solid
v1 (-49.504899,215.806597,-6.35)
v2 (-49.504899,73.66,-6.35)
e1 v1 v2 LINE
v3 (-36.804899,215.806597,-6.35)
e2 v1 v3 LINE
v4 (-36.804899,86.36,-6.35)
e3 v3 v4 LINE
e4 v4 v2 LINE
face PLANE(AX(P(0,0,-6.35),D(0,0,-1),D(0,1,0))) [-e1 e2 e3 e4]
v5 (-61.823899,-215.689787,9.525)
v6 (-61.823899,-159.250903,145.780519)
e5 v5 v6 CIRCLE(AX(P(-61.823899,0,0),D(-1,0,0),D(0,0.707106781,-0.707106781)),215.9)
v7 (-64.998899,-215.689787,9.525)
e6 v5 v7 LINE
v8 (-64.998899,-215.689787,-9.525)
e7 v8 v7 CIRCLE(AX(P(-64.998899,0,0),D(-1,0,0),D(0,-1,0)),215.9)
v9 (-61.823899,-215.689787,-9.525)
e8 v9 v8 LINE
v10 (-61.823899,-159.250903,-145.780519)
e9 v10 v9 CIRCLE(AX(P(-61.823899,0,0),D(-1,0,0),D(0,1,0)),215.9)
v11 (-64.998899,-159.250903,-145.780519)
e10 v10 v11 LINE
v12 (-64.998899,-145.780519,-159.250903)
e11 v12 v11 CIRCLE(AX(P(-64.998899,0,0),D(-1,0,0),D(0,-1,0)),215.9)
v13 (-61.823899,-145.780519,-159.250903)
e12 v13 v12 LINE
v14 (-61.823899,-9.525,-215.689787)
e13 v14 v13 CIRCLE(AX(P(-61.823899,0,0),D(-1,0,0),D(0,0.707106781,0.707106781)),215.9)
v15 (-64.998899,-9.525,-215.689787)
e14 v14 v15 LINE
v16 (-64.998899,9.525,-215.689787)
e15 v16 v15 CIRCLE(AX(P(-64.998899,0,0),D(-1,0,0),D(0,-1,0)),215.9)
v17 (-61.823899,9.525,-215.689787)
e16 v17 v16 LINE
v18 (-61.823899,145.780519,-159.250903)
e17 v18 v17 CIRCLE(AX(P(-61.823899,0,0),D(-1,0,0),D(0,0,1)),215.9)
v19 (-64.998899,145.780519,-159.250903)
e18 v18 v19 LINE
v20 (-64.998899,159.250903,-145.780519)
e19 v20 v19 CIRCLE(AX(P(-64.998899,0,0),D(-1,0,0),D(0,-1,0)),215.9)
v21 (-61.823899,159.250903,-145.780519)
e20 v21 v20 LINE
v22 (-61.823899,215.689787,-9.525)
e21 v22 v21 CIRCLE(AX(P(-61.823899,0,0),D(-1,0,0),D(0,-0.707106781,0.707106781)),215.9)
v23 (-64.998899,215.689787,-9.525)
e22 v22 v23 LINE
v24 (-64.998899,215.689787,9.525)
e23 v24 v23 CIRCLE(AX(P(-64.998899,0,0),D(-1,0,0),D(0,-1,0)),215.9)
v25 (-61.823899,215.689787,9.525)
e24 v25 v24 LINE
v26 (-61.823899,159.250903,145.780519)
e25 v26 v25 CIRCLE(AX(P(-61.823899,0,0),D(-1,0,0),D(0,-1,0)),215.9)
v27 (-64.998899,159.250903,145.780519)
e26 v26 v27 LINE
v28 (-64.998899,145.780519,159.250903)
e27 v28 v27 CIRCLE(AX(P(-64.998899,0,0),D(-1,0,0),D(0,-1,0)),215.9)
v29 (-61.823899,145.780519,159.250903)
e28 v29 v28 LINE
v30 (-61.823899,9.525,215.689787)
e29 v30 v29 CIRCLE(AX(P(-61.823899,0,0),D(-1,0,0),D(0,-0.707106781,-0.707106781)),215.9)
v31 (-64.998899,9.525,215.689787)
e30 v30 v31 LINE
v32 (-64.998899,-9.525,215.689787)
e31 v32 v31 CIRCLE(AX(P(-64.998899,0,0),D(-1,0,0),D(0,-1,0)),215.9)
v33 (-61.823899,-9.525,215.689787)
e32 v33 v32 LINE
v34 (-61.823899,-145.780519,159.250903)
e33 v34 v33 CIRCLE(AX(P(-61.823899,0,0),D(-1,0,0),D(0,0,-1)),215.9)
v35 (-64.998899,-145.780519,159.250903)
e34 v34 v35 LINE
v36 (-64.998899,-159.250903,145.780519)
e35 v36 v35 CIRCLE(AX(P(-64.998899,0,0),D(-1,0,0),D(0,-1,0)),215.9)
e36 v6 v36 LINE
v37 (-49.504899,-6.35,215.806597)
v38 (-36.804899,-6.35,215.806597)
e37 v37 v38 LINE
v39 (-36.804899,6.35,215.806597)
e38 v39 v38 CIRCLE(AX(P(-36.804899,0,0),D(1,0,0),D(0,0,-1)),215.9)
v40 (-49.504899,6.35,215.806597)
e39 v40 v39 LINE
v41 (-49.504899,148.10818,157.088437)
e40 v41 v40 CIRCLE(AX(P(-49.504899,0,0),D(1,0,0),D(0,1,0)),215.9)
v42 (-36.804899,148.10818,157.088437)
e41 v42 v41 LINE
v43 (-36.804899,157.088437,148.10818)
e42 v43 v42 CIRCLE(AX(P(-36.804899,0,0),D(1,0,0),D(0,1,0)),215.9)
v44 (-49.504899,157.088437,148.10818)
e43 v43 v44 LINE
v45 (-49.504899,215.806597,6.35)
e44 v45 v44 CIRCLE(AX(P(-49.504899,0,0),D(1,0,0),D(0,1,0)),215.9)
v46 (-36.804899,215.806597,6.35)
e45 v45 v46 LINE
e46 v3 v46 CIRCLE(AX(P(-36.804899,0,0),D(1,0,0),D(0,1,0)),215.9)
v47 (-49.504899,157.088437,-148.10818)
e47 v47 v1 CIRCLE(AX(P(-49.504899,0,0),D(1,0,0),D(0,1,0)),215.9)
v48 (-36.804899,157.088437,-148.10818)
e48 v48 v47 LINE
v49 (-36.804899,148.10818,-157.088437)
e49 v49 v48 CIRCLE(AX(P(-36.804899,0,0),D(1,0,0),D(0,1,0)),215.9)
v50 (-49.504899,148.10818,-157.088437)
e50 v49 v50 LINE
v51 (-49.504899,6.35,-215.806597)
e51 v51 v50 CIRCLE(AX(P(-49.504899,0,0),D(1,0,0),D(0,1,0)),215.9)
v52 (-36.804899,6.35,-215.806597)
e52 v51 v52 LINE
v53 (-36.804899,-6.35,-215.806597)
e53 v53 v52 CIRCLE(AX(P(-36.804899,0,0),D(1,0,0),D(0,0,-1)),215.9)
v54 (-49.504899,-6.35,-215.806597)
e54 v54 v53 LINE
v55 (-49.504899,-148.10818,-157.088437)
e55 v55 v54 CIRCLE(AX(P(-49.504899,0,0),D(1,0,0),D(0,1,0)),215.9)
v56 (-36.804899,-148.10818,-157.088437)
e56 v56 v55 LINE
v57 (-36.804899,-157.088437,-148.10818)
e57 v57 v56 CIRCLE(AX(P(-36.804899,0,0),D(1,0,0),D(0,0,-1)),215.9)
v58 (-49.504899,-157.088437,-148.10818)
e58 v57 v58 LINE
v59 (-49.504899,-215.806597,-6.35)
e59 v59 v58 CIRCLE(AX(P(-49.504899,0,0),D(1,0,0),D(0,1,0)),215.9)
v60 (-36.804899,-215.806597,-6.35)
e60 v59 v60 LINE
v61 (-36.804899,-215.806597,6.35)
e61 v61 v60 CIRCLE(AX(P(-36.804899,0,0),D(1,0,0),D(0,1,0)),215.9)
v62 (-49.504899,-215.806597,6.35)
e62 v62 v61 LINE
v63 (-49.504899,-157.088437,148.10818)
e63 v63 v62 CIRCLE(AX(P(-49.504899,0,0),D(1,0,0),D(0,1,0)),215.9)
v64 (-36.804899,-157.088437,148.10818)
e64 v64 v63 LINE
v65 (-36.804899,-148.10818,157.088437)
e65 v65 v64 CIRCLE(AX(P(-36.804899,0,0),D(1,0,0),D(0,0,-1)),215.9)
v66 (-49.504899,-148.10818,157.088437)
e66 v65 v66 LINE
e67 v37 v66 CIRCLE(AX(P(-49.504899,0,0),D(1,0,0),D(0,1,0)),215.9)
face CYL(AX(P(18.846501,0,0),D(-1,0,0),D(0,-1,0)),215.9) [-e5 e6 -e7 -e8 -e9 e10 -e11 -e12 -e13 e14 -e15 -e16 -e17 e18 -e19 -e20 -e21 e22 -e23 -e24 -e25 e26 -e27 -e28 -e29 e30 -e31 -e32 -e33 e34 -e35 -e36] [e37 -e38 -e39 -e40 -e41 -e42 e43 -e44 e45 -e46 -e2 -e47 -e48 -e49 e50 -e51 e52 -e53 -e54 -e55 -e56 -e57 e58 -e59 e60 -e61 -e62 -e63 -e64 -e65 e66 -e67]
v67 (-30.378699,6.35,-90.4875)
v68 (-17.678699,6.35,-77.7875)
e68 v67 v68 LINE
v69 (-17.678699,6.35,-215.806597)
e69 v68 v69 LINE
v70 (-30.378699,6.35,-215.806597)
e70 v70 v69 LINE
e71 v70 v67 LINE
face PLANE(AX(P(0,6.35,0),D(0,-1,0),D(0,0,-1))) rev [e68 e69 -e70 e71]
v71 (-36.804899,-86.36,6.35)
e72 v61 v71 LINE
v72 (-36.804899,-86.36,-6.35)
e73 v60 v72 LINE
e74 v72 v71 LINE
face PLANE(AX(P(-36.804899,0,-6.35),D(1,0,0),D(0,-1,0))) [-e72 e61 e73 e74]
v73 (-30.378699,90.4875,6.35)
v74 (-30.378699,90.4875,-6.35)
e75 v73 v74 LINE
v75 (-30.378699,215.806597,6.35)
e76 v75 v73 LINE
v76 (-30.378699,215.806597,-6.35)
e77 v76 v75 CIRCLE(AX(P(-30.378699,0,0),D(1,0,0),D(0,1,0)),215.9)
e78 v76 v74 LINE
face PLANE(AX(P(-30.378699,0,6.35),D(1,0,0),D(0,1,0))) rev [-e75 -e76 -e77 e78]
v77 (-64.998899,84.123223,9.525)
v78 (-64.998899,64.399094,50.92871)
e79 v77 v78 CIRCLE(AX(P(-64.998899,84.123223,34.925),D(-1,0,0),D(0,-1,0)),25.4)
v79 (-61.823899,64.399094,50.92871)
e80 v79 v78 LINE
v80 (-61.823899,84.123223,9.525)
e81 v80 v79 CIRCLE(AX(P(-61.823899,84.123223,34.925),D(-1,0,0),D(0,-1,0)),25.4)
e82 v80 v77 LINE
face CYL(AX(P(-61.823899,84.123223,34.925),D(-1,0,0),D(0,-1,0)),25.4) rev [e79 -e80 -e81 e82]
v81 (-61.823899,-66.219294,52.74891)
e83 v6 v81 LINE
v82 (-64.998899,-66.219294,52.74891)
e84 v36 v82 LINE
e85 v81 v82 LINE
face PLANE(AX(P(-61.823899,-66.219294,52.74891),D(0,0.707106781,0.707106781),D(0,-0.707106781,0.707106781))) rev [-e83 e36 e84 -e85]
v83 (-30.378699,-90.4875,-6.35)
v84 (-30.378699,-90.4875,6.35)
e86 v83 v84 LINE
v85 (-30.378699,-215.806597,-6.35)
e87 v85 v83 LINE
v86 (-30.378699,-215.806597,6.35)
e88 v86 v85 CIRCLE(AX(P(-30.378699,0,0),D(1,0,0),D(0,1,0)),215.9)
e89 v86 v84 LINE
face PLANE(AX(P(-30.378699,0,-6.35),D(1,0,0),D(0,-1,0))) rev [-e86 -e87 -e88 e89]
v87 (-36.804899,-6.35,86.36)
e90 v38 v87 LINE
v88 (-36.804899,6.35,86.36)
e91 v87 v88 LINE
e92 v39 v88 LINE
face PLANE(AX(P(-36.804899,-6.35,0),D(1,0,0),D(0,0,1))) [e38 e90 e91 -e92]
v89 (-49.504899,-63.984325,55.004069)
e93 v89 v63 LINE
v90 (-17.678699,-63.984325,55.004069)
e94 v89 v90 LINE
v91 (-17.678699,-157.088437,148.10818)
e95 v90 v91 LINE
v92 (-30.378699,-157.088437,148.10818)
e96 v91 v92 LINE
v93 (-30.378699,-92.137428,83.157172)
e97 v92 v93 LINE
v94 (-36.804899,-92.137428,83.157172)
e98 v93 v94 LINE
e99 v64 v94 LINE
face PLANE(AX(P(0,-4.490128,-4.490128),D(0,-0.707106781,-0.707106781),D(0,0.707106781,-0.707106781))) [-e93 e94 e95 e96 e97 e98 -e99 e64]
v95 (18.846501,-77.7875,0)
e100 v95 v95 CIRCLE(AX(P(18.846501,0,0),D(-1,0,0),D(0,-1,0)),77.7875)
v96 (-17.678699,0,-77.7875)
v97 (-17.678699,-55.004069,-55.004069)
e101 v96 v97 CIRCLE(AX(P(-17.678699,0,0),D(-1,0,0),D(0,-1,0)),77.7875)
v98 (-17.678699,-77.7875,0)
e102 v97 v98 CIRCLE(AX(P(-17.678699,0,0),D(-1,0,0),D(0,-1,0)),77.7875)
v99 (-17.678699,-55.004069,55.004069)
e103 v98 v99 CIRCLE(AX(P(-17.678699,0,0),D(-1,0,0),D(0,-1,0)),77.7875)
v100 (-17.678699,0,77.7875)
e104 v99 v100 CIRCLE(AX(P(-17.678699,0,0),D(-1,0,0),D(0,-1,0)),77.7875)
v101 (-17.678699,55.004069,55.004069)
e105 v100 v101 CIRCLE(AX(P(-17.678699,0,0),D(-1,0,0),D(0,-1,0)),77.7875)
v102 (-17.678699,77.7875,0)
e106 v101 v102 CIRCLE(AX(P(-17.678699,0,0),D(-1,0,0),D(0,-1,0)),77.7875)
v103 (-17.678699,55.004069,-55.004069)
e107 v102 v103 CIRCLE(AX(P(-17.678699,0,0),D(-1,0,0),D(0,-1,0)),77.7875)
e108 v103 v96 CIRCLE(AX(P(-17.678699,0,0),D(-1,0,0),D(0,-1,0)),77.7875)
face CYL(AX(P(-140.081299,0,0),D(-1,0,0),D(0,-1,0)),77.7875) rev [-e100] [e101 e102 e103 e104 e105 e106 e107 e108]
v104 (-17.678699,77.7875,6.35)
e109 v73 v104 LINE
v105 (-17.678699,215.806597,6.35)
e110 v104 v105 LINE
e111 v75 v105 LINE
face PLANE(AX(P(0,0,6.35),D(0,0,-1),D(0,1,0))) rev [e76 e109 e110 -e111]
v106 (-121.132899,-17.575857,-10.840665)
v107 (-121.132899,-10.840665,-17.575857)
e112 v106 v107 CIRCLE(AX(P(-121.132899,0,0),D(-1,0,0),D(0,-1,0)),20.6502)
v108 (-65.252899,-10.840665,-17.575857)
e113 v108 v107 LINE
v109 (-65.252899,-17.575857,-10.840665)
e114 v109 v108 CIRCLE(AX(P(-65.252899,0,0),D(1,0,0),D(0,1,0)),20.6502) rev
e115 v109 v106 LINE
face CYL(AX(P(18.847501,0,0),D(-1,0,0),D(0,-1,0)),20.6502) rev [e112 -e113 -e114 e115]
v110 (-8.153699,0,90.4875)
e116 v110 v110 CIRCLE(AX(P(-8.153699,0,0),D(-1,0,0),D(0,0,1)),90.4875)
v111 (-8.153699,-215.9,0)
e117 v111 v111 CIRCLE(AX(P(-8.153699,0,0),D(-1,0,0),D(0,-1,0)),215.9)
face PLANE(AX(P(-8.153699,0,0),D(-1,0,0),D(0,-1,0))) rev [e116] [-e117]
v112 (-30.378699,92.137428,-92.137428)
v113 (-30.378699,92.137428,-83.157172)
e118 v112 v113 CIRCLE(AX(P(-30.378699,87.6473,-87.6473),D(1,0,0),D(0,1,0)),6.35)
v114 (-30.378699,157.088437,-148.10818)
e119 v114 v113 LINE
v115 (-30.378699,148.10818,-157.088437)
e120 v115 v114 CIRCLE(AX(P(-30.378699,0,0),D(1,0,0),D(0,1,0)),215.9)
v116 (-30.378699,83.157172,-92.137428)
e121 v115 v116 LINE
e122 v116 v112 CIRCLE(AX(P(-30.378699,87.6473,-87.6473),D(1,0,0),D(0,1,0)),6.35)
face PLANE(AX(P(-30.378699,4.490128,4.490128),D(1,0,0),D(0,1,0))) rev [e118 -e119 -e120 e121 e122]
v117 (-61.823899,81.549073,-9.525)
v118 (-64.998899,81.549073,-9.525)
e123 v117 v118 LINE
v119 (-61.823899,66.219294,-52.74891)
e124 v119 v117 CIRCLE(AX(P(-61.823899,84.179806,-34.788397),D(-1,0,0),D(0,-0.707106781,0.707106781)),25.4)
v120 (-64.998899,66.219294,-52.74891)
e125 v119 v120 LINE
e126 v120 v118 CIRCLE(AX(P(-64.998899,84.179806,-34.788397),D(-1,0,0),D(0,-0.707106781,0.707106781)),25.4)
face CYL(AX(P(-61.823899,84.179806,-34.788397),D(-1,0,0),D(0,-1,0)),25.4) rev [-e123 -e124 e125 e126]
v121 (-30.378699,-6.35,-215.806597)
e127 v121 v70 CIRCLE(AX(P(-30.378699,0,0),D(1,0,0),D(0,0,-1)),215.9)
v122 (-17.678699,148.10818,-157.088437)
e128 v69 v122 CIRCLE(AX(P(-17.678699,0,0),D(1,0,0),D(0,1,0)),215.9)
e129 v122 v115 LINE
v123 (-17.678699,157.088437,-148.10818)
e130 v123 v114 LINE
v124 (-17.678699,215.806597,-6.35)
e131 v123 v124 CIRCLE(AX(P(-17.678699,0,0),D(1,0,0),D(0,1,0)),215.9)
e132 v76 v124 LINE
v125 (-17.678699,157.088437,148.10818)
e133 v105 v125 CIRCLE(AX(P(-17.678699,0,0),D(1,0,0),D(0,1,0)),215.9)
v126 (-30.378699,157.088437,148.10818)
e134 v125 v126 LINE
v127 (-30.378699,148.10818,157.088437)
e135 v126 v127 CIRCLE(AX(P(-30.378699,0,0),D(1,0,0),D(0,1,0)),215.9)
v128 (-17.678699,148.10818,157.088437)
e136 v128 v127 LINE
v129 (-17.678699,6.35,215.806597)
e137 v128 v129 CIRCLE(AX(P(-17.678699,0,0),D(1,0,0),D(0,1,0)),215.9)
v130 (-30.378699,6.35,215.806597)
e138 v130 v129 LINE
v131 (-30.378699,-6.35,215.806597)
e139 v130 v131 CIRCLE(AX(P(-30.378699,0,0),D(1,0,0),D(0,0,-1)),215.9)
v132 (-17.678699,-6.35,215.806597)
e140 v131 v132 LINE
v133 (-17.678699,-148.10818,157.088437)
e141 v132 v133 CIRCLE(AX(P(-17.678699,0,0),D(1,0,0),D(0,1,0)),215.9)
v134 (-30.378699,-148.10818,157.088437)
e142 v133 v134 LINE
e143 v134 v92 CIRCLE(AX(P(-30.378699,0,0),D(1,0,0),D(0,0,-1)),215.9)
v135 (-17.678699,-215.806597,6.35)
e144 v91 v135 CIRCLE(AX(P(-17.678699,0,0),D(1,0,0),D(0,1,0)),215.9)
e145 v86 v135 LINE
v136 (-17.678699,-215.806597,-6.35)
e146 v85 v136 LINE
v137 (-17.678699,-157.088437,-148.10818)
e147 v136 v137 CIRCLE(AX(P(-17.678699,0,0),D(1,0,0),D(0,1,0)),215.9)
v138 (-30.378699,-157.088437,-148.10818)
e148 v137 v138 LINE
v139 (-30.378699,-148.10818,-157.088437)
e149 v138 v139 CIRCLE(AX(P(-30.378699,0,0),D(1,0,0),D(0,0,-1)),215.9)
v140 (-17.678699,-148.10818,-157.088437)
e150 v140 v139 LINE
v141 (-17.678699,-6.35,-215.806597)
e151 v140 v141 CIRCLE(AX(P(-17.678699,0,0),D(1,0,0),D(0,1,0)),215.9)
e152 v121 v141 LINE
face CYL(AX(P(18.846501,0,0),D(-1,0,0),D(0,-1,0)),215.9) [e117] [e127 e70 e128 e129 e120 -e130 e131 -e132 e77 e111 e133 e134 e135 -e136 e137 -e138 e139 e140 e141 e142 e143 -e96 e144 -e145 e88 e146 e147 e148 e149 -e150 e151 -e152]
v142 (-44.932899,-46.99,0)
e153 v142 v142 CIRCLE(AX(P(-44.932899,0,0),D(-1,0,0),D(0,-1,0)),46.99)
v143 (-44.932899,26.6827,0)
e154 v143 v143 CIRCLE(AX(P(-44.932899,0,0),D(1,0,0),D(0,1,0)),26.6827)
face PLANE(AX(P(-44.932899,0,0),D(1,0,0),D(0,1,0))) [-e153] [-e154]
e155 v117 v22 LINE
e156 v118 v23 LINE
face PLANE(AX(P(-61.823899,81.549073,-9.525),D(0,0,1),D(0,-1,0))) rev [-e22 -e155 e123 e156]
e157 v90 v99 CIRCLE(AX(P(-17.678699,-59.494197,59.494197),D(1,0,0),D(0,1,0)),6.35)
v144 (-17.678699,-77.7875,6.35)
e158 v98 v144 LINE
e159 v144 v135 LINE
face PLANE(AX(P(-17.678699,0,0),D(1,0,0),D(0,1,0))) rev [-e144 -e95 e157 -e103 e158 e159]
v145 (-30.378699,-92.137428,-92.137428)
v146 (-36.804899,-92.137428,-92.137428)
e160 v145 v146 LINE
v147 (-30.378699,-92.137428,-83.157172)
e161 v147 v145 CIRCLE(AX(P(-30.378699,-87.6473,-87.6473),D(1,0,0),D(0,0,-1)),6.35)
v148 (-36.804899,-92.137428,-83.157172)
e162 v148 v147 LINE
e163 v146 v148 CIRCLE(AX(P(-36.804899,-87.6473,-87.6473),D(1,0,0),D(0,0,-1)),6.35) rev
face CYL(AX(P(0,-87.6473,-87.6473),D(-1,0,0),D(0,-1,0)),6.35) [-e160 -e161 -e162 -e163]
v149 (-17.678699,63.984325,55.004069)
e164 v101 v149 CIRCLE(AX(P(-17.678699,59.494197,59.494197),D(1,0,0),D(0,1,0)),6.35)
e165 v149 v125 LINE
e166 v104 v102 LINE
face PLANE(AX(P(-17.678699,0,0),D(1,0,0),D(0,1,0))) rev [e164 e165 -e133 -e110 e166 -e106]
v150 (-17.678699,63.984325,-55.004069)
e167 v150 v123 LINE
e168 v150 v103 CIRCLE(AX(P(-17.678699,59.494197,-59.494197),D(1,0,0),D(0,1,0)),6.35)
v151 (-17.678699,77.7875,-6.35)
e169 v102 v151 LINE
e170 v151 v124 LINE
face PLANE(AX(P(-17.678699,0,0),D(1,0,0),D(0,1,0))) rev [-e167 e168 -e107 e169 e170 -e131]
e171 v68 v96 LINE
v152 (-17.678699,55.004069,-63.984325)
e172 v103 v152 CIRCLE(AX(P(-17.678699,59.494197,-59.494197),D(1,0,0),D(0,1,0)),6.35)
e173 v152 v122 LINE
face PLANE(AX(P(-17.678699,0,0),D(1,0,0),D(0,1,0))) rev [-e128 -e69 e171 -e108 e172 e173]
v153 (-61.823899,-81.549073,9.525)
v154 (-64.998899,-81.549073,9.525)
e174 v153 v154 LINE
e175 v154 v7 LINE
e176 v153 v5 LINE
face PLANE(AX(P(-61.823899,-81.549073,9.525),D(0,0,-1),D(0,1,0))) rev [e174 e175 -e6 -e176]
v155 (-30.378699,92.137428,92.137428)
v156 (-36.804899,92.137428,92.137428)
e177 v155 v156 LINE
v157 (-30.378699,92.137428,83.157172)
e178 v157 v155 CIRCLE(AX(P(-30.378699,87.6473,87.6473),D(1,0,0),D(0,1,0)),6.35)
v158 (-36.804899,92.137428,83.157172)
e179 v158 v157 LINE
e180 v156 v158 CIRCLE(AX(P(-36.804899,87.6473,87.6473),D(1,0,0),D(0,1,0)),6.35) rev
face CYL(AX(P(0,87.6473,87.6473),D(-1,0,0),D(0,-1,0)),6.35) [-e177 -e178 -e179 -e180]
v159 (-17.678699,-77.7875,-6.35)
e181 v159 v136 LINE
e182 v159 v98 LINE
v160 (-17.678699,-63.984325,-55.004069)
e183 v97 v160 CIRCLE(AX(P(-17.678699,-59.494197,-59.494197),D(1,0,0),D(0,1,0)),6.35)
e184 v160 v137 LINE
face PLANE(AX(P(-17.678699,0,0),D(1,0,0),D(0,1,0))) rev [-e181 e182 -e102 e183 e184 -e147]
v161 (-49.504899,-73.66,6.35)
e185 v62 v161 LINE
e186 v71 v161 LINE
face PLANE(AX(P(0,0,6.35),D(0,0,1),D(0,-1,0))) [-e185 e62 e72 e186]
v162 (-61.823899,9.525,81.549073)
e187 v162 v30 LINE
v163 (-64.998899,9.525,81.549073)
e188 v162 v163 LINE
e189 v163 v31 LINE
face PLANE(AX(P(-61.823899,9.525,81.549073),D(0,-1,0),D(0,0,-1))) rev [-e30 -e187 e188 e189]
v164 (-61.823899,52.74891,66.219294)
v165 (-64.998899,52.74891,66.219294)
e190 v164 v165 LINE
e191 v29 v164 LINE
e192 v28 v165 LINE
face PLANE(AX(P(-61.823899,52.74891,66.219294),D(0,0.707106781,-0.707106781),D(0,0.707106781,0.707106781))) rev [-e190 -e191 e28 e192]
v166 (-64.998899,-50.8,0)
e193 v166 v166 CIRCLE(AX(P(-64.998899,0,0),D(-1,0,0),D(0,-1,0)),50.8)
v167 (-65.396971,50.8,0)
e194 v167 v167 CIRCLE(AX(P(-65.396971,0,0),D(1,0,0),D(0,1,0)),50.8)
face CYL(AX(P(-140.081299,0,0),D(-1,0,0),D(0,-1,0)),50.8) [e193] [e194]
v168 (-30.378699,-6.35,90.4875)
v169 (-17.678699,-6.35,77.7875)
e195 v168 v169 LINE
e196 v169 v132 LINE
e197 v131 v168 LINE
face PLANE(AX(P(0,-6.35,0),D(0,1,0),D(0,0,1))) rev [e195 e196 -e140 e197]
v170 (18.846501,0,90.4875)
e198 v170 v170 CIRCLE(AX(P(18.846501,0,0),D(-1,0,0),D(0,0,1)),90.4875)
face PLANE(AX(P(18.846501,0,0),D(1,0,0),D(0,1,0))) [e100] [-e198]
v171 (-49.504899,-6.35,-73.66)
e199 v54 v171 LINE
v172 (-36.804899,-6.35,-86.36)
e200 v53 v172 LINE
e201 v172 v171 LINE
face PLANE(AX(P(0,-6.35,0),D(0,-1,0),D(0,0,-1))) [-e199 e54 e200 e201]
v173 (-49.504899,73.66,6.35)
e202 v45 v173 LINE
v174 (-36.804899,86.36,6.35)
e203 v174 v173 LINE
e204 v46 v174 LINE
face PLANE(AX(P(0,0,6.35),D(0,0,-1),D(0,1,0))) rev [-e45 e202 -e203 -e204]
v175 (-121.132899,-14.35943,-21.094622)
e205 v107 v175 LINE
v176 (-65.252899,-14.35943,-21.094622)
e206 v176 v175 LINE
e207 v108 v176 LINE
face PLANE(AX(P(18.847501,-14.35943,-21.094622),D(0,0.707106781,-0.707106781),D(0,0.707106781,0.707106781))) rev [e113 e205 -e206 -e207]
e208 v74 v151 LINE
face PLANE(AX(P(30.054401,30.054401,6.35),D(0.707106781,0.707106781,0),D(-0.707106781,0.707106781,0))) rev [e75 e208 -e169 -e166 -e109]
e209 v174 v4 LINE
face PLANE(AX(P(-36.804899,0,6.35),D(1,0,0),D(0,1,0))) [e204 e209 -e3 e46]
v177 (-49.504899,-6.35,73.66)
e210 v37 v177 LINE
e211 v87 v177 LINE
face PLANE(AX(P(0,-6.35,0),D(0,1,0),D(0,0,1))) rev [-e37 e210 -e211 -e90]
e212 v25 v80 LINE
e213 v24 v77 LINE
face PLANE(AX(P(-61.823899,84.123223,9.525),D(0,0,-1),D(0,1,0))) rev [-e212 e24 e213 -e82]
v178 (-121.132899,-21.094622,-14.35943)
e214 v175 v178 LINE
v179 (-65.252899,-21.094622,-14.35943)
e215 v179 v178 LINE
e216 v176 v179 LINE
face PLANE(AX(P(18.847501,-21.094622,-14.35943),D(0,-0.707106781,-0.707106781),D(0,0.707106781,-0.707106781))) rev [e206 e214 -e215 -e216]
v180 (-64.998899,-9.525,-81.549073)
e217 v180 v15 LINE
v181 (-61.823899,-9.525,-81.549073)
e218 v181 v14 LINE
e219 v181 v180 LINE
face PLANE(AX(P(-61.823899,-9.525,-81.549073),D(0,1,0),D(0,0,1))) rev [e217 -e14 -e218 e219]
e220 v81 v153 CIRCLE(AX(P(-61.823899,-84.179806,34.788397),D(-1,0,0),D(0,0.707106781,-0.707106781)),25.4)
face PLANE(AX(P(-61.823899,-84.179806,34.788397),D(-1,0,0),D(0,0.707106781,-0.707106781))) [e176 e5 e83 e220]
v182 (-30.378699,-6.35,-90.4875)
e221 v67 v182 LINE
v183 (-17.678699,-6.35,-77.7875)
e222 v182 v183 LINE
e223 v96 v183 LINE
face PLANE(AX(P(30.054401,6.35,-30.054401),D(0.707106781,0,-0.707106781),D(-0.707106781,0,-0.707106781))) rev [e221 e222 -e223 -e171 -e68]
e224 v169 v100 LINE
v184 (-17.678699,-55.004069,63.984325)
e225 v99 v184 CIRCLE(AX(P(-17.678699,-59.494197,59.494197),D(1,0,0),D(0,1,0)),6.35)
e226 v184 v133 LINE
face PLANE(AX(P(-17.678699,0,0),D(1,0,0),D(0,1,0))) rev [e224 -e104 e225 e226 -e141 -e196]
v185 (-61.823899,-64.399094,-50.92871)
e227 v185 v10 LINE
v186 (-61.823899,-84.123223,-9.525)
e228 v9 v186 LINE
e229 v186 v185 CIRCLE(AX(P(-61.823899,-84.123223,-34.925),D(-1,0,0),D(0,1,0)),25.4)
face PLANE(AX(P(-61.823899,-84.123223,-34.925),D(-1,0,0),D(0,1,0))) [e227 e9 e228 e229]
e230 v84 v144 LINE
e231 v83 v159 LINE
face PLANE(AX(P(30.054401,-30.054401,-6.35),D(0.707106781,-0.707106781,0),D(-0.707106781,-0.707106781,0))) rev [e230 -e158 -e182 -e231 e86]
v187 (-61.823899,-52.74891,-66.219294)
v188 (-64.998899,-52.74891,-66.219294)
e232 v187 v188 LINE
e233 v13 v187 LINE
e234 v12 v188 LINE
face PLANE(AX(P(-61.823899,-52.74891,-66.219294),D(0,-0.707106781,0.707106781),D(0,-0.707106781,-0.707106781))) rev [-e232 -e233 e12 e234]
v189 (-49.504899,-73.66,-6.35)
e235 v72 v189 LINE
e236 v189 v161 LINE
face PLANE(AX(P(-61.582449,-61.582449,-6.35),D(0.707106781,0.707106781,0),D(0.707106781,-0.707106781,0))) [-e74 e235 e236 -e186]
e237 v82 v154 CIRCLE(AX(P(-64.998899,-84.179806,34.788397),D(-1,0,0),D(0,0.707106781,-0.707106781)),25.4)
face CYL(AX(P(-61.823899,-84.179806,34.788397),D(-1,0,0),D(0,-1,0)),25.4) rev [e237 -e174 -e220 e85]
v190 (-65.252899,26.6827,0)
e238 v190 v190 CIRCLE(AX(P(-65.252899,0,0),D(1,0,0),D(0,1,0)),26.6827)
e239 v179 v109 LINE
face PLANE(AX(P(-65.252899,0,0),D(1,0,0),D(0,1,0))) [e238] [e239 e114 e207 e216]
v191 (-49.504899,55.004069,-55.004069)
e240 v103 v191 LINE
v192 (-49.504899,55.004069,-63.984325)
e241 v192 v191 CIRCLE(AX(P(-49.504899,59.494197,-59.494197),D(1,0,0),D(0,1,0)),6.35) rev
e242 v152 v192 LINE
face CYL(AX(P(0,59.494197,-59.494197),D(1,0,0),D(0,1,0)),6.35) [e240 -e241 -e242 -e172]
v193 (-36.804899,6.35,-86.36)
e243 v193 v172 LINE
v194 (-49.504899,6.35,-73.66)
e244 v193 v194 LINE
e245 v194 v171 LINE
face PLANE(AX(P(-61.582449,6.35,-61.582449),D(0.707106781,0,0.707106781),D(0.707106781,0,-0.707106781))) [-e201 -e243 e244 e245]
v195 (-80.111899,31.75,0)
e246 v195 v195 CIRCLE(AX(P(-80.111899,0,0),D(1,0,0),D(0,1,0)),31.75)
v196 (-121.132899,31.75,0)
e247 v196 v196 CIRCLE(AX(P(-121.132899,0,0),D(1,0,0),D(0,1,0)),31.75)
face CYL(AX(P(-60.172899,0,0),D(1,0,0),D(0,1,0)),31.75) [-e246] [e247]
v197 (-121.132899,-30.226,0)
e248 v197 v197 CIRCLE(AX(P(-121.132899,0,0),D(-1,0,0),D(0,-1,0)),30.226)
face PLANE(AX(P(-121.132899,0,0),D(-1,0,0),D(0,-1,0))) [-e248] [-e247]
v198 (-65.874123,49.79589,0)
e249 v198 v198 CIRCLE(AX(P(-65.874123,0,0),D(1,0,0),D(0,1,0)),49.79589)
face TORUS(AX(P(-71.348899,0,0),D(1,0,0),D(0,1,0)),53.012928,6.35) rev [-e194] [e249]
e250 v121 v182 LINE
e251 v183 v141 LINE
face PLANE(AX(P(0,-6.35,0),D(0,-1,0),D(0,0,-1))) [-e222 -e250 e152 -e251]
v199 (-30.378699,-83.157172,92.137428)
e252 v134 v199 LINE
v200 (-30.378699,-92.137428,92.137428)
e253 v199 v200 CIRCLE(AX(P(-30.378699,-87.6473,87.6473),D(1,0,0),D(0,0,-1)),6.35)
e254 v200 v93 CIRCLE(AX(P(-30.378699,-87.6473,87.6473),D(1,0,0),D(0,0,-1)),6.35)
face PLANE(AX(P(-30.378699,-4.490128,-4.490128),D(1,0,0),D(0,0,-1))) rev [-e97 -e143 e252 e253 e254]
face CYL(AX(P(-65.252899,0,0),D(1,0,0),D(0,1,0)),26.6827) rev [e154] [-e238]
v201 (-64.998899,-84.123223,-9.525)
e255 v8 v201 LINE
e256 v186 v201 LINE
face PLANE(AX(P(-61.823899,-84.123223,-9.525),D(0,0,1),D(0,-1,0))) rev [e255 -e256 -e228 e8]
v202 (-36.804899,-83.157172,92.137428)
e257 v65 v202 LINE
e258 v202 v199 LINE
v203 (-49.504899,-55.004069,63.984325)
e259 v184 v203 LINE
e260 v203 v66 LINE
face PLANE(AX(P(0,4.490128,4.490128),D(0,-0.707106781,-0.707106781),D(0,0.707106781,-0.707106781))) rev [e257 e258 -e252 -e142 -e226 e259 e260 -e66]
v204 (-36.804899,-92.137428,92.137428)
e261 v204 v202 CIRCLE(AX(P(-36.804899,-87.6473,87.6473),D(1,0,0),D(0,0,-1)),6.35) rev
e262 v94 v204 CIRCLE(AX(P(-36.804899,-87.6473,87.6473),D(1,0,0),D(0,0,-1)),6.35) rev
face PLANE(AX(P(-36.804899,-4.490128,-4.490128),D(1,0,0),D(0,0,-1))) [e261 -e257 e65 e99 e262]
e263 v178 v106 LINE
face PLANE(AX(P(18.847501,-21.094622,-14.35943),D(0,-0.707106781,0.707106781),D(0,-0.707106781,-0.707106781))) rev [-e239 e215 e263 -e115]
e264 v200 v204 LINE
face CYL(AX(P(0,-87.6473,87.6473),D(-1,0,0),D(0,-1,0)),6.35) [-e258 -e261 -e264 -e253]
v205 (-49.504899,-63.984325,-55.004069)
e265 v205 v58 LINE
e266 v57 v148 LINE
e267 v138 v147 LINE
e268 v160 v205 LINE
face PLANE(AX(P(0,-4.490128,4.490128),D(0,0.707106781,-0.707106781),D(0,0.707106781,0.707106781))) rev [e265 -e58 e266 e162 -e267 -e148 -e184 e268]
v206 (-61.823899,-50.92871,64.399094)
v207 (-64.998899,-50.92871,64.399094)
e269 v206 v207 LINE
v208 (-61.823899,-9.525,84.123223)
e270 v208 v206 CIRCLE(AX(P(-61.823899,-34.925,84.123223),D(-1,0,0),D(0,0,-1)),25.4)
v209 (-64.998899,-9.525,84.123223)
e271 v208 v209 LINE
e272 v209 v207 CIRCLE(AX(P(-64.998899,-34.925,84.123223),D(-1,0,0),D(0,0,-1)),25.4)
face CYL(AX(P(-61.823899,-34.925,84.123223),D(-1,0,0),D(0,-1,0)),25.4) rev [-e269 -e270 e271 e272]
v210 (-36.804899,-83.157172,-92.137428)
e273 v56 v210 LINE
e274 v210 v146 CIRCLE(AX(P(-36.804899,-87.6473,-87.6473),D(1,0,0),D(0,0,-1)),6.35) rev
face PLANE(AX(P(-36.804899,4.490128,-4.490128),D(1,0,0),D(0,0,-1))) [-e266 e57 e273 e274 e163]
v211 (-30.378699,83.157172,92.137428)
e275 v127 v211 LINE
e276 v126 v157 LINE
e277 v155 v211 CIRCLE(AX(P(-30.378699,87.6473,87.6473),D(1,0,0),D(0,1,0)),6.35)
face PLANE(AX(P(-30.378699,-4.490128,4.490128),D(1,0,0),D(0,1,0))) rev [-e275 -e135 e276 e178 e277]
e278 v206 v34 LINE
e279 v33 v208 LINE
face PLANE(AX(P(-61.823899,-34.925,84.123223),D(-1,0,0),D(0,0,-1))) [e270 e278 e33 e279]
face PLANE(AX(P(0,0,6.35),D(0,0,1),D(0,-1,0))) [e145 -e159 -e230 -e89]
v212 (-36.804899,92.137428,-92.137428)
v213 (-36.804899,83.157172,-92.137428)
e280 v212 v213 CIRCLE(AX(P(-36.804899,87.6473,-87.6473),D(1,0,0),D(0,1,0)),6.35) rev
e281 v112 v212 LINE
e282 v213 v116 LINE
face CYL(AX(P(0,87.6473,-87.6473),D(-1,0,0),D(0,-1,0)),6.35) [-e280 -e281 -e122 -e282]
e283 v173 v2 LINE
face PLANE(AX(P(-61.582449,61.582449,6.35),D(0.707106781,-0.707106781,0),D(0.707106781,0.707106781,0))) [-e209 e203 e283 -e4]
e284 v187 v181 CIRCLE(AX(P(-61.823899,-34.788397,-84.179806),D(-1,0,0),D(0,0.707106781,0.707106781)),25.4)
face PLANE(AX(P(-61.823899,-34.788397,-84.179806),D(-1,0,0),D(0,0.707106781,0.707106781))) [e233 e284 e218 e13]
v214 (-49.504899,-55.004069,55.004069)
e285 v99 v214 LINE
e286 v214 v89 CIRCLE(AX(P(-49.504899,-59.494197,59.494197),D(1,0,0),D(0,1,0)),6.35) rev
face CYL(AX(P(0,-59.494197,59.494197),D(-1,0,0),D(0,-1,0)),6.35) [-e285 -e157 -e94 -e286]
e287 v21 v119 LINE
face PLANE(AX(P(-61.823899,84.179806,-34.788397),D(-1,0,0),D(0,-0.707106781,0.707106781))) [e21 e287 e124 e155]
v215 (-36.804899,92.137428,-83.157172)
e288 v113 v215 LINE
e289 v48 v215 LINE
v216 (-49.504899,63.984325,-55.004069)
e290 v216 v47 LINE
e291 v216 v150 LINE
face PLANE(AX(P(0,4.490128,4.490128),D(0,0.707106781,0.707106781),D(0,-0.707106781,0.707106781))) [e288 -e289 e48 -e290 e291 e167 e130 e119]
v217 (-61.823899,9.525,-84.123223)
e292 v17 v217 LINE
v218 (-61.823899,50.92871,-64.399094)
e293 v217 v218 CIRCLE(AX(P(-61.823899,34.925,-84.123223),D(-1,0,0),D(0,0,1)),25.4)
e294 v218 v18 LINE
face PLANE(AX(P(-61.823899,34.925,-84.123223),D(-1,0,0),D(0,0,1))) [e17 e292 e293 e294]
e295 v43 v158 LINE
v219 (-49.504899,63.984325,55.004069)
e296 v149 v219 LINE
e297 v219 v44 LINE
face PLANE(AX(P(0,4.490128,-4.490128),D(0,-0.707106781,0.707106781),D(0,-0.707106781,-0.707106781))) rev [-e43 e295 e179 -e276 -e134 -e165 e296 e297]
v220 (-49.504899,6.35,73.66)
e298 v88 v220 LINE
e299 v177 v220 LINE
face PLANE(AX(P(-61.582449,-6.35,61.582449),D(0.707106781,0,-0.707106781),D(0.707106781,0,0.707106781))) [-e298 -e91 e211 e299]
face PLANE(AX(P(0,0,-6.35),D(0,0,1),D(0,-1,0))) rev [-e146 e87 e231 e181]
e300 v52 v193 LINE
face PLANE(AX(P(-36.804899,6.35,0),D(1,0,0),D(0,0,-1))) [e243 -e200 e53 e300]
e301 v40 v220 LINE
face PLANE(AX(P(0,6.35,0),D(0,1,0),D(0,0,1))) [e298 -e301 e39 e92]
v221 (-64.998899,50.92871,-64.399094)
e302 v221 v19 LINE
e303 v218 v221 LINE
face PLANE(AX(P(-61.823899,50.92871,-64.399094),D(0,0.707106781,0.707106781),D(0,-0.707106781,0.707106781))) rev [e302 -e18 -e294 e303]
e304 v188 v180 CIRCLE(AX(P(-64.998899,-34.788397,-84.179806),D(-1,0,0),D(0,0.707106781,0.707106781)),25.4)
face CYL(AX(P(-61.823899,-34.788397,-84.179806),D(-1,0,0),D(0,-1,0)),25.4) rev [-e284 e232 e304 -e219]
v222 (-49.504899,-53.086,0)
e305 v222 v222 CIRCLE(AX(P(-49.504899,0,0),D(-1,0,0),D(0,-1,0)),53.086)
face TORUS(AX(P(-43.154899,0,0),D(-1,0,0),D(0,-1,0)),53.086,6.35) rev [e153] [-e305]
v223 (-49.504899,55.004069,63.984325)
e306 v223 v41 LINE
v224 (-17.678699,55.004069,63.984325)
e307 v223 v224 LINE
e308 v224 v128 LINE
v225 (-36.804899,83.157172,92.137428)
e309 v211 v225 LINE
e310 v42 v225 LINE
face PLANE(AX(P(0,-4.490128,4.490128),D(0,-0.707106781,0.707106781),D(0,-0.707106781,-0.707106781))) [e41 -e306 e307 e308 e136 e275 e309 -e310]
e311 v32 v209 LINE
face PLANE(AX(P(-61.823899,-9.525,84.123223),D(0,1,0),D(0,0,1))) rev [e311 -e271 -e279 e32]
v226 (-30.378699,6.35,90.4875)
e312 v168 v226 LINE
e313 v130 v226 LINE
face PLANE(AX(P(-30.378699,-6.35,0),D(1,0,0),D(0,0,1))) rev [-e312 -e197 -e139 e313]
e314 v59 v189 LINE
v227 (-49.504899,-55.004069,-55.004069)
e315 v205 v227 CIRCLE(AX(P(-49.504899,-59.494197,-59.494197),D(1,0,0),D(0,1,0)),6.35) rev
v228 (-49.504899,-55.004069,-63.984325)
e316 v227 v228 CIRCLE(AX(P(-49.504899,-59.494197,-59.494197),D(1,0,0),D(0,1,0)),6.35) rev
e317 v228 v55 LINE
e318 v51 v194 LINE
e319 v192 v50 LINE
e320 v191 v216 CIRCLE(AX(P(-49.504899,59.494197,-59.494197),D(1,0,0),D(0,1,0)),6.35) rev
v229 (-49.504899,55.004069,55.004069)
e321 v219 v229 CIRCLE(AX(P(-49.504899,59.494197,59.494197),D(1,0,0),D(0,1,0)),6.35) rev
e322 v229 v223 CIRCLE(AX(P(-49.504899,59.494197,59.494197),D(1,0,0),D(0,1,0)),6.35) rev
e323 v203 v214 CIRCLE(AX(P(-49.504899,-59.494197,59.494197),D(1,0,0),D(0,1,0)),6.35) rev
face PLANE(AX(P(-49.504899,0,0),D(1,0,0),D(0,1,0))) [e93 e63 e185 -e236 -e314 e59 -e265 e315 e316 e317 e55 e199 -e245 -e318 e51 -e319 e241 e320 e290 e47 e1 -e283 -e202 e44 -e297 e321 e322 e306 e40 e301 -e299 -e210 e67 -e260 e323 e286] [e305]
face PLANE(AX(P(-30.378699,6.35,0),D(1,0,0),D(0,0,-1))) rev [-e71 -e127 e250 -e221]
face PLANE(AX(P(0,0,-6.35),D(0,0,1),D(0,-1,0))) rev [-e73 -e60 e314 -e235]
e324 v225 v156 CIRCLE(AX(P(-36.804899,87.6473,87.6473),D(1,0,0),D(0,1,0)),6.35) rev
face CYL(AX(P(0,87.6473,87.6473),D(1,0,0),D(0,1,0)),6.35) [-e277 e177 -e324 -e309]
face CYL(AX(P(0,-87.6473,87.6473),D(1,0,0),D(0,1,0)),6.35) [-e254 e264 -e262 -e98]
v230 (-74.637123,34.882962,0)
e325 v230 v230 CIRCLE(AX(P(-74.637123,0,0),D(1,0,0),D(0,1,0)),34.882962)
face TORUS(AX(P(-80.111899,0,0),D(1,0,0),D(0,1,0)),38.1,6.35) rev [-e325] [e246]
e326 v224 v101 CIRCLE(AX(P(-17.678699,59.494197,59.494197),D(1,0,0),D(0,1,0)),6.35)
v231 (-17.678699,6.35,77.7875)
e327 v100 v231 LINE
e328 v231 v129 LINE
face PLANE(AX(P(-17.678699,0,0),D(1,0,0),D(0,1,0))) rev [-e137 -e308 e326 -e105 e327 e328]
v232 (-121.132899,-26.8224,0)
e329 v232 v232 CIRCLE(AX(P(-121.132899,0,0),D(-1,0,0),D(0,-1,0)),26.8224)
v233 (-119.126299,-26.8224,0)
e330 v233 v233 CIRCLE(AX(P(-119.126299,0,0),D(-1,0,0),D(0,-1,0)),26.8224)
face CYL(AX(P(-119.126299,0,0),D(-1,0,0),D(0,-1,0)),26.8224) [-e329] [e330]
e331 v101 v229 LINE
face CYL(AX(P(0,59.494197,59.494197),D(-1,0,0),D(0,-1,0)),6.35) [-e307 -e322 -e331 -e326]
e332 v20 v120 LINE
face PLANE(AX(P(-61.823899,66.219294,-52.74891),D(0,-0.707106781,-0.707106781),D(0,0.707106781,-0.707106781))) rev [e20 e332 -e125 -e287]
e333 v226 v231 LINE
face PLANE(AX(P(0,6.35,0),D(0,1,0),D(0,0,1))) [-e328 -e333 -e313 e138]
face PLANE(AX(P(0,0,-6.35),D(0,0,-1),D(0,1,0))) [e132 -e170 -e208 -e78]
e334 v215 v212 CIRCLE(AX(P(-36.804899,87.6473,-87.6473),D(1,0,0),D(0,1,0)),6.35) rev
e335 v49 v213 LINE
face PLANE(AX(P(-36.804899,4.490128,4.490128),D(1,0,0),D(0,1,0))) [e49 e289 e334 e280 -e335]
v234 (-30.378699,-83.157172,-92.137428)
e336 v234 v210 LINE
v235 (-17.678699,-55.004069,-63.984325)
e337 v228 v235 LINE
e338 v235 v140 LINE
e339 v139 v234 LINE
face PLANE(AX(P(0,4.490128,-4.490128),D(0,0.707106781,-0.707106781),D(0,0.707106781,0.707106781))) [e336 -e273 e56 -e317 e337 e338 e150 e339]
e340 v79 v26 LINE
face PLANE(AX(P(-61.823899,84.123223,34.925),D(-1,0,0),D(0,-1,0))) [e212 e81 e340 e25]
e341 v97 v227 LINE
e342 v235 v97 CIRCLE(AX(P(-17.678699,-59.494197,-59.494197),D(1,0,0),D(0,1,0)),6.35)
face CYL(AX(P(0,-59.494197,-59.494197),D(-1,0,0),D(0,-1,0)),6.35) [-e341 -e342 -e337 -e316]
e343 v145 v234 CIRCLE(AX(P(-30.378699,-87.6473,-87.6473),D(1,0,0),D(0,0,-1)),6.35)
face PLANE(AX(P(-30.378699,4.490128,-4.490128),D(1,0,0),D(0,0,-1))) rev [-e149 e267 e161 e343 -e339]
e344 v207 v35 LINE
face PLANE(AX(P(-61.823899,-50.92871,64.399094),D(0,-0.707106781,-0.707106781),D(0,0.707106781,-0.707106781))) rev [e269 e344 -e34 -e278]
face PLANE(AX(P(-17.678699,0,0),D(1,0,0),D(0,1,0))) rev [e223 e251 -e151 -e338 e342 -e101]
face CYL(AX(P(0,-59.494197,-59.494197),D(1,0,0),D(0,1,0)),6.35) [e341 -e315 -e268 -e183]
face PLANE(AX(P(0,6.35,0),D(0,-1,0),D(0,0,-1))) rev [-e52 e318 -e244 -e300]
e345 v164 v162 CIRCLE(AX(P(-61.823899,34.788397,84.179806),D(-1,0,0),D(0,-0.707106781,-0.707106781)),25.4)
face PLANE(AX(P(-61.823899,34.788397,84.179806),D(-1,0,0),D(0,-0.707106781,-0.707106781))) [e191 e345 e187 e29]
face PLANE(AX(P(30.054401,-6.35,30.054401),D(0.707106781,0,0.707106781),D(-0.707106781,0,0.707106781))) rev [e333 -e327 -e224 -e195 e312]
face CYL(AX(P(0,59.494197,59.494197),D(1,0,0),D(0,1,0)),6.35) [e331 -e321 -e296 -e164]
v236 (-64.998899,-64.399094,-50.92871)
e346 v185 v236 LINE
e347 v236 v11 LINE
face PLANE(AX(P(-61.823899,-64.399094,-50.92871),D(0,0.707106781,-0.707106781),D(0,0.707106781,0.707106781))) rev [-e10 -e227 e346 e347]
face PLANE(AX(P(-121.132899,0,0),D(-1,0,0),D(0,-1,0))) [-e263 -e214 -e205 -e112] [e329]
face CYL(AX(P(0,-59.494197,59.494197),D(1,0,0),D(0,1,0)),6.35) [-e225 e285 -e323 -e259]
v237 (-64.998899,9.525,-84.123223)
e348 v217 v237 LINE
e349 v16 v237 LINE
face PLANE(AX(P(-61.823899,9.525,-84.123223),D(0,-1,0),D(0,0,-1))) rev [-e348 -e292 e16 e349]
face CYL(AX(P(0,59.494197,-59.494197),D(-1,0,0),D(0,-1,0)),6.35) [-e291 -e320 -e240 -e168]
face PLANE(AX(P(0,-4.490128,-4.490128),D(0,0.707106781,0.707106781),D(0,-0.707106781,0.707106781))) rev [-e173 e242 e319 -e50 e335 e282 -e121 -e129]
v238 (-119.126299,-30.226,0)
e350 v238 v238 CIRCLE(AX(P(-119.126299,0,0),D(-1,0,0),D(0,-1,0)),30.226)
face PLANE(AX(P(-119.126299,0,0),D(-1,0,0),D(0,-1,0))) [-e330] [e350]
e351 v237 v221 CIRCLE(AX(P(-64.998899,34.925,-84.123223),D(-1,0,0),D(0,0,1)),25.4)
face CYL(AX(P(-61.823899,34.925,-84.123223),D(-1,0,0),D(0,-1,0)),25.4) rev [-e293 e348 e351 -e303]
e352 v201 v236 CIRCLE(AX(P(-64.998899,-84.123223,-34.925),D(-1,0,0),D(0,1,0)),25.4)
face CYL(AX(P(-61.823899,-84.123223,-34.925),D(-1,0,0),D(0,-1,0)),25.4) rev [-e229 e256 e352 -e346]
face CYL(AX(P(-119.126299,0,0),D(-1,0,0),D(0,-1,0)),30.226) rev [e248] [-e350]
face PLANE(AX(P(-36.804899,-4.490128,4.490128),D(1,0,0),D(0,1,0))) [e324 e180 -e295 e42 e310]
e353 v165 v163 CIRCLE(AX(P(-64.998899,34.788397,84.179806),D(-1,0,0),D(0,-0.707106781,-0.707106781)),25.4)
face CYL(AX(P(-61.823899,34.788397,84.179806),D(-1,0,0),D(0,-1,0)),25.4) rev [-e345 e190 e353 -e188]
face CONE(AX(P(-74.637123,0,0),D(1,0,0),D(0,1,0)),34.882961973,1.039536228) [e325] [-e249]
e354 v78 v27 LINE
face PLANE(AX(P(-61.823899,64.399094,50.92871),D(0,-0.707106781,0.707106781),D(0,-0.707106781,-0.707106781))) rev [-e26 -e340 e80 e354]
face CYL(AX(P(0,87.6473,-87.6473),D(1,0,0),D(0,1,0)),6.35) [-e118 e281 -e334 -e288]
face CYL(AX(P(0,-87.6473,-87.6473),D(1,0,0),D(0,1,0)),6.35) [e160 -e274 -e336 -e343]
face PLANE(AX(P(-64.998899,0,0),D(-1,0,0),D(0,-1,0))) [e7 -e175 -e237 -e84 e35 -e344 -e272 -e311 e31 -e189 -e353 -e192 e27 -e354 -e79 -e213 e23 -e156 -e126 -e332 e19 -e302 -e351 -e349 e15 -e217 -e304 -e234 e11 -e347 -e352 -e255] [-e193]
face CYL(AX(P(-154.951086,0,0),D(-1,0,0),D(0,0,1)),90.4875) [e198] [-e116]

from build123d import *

# Parameters (mm, degrees)
BOSS_EXTRUDE3_DEPTH      = 6.35
FILLET1_R                = 6.35
CIRPATTERN5_COUNT        = 4
FILLET1_OF_CIRPATTERN5_R = 6.35
BOSS_EXTRUDE4_DEPTH      = 6.35
CIRPATTERN4_COUNT        = 4
SKETCH6_R                = 234.193665804
SKETCH6_R_2              = 215.9
CUT_EXTRUDE1_DEPTH       = 350.00288517
FILLET2_R                = 0.635
SKETCH7_R                = 60.93897947
CUT_EXTRUDE2_DEPTH       = 4.953
SKETCH8_R                = 79.670197019
CUT_EXTRUDE3_DEPTH       = 18.9484
CUT_EXTRUDE4_START       = 20.32
SKETCH11_R               = 219.71
SKETCH11_R_2             = 50.8
CUT_EXTRUDE4_DEPTH       = 20.32
CUT_EXTRUDE10_REACH      = 337.887
SKETCH20_R               = 30.226
SKETCH20_R_2             = 26.8224
CUT_EXTRUDE11_DEPTH      = 2.0066
CUT_EXTRUDE13_DEPTH      = 3.175
CIRPATTERN6_COUNT        = 8
SKETCH24_W               = 27.0002
SKETCH24_H               = 10.092146942
SKETCH25_R               = 26.6827
CUT_EXTRUDE14_DEPTH      = 20.32


with BuildPart() as part:
    # Sketch1 → Revolve2 (revolve)
    with BuildSketch(Plane.XY, mode=Mode.PRIVATE) as revolve2_sk:
        with BuildLine():
            Line((-140.081298787, 50.8), (-140.081298787, 0))
            Line((-140.081298787, 0), (-39.979898787, 0))
            Line((-39.979898787, 0), (-39.979898787, 46.736))
            Line((-39.979898787, 46.736), (-43.154898787, 46.736))
            ThreePointArc((-43.154898787, 46.736), (-47.645026847, 48.595871939), (-49.504898787, 53.086))
            Line((-49.504898787, 53.086), (-49.504898787, 219.71))
            Line((-49.504898787, 219.71), (-64.998898787, 219.71))
            Line((-64.998898787, 219.71), (-64.998898787, 63.5))
            ThreePointArc((-64.998898787, 63.5), (-68.718642666, 54.519743879), (-77.698898787, 50.8))
            Line((-77.698898787, 50.8), (-140.081298787, 50.8))
        make_face()
        with BuildLine():
            Line((-9.677698787, 219.71), (-17.678698787, 219.71))
            Line((-17.678698787, 219.71), (-17.678698787, 77.7875))
            Line((-17.678698787, 77.7875), (1.650701213, 77.7875))
            Line((1.650701213, 77.7875), (18.846501213, 77.7875))
            Line((18.846501213, 77.7875), (18.846501213, 93.599))
            ThreePointArc((18.846501213, 93.599), (18.400131948, 94.676630735), (17.322501213, 95.123))
            Line((17.322501213, 95.123), (-6.629698787, 95.123))
            ThreePointArc((-6.629698787, 95.123), (-7.707329521, 95.569369265), (-8.153698787, 96.647))
            Line((-8.153698787, 96.647), (-8.153698787, 218.186))
            ThreePointArc((-8.153698787, 218.186), (-8.600068052, 219.263630735), (-9.677698787, 219.71))
        make_face()
    revolve(revolve2_sk.sketch.rotate(Axis((-140.081298787, 0, 0), (1, 0, 0)), 180), axis=Axis((-140.081298787, 0, 0), (1, 0, 0)))

    # Sketch4 → Boss-Extrude3 (add, symmetric)
    with BuildSketch(Plane(origin=(0, 0, 0), x_dir=(1, 0, 0), z_dir=(0, -0.7071067811865488, 0.7071067811865464))):
        Polygon((-17.678698787, 219.71), (-30.378698787, 219.71), (-30.378698787, 130.302), (-36.804898787, 130.302), (-36.804898787, 219.71), (-49.504898787, 219.71), (-49.504898787, 77.7875), (-17.678698787, 77.7875), align=None)
    boss_extrude3 = extrude(amount=BOSS_EXTRUDE3_DEPTH, both=True)

    # Fillet1
    # the kernel refuses this fillet: 6.35 mm, written as the material it takes off along each edge
    with BuildSketch(Plane(origin=(-30.378698787, 87.647299742, 96.627555863), x_dir=(0, -0.7071067811865464, -0.7071067811865486), z_dir=(-1, 0, 0))) as fillet1_piece_1:
        with BuildLine():
            CenterArc((FILLET1_R, -FILLET1_R), FILLET1_R, 90, 90)
            Line((0, -FILLET1_R), (0, 0))
            Line((0, 0), (FILLET1_R, 0))
        make_face()
    extrude(amount=6.4262, mode=Mode.SUBTRACT)
    with BuildSketch(Plane(origin=(-30.378698787, 96.627555863, 87.647299742), x_dir=(0, -0.7071067811865464, -0.7071067811865486), z_dir=(-1, 0, 0))) as fillet1_piece_2:
        with BuildLine():
            CenterArc((FILLET1_R, FILLET1_R), FILLET1_R, 180, 90)
            Line((0, FILLET1_R), (0, 0))
            Line((0, 0), (FILLET1_R, 0))
        make_face()
    extrude(amount=6.4262, mode=Mode.SUBTRACT)
    with BuildSketch(Plane(origin=(-49.504898787, 59.494196802, 50.513940681), x_dir=(0, 0.707106781186547, 0.7071067811865481), z_dir=(1, 0, 0)), Plane(origin=(-49.504898787, 50.513940681, 59.494196802), x_dir=(0, 0.7071067811865492, -0.7071067811865459), z_dir=(1, 0, 0))) as fillet1_piece_3:
        with BuildLine():
            CenterArc((FILLET1_R, FILLET1_R), FILLET1_R, 180, 90)
            Line((0, FILLET1_R), (0, 0))
            Line((0, 0), (FILLET1_R, 0))
        make_face()
    extrude(amount=31.8262, mode=Mode.SUBTRACT)

    # CirPattern5: Boss-Extrude3 ×4 about axis
    cirpattern5_axis = Axis((0, 0, 0), (1, 0, 0))
    for i in range(1, CIRPATTERN5_COUNT):
        add(boss_extrude3.rotate(cirpattern5_axis, i * 360 / CIRPATTERN5_COUNT))

    # Fillet1 of CirPattern5
    # the kernel refuses this fillet: 6.35 mm, written as the material it takes off along each edge
    with BuildSketch(Plane(origin=(-30.378698787, -96.627555863, 87.647299742), x_dir=(0, 0.7071067811865509, -0.7071067811865441), z_dir=(-1, 0, 0)), Plane(origin=(-30.378698787, -87.647299742, -96.627555863), x_dir=(0, 0.7071067811865452, 0.7071067811865498), z_dir=(-1, 0, 0)), Plane(origin=(-30.378698787, 96.627555863, -87.647299742), x_dir=(0, -0.7071067811865498, 0.7071067811865454), z_dir=(-1, 0, 0))) as fillet1_of_cirpattern5_piece_1:
        with BuildLine():
            CenterArc((FILLET1_OF_CIRPATTERN5_R, -FILLET1_OF_CIRPATTERN5_R), FILLET1_OF_CIRPATTERN5_R, 90, 90)
            Line((0, -FILLET1_OF_CIRPATTERN5_R), (0, 0))
            Line((0, 0), (FILLET1_OF_CIRPATTERN5_R, 0))
        make_face()
    extrude(amount=6.4262, mode=Mode.SUBTRACT)
    with BuildSketch(Plane(origin=(-30.378698787, -87.647299742, 96.627555863), x_dir=(0, 0.7071067811865509, -0.7071067811865441), z_dir=(-1, 0, 0)), Plane(origin=(-30.378698787, -96.627555863, -87.647299742), x_dir=(0, 0.7071067811865441, 0.7071067811865509), z_dir=(-1, 0, 0)), Plane(origin=(-30.378698787, 87.647299742, -96.627555863), x_dir=(0, -0.7071067811865509, 0.7071067811865441), z_dir=(-1, 0, 0))) as fillet1_of_cirpattern5_piece_2:
        with BuildLine():
            CenterArc((FILLET1_OF_CIRPATTERN5_R, FILLET1_OF_CIRPATTERN5_R), FILLET1_OF_CIRPATTERN5_R, 180, 90)
            Line((0, FILLET1_OF_CIRPATTERN5_R), (0, 0))
            Line((0, 0), (FILLET1_OF_CIRPATTERN5_R, 0))
        make_face()
    extrude(amount=6.4262, mode=Mode.SUBTRACT)
    with BuildSketch(Plane(origin=(-49.504898787, -50.513940681, 59.494196802), x_dir=(0, -0.7071067811865475, 0.7071067811865475), z_dir=(1, 0, 0)), Plane(origin=(-49.504898787, -59.494196802, 50.513940681), x_dir=(0, 0.7071067811865464, 0.7071067811865486), z_dir=(1, 0, 0)), Plane(origin=(-49.504898787, -59.494196802, -50.513940681), x_dir=(0, -0.7071067811865481, -0.707106781186547), z_dir=(1, 0, 0)), Plane(origin=(-49.504898787, -50.513940681, -59.494196802), x_dir=(0, -0.7071067811865486, 0.7071067811865464), z_dir=(1, 0, 0)), Plane(origin=(-49.504898787, 50.513940681, -59.494196802), x_dir=(0, 0.7071067811865476, -0.7071067811865476), z_dir=(1, 0, 0)), Plane(origin=(-49.504898787, 59.494196802, -50.513940681), x_dir=(0, -0.7071067811865459, -0.7071067811865492), z_dir=(1, 0, 0))) as fillet1_of_cirpattern5_piece_3:
        with BuildLine():
            CenterArc((FILLET1_OF_CIRPATTERN5_R, FILLET1_OF_CIRPATTERN5_R), FILLET1_OF_CIRPATTERN5_R, 180, 90)
            Line((0, FILLET1_OF_CIRPATTERN5_R), (0, 0))
            Line((0, 0), (FILLET1_OF_CIRPATTERN5_R, 0))
        make_face()
    extrude(amount=31.8262, mode=Mode.SUBTRACT)

    # Sketch5 → Boss-Extrude4 (add, symmetric)
    with BuildSketch(Plane(origin=(0, 0, 0), x_dir=(-1, 0, 0), z_dir=(0, 0, -1))):
        Polygon((49.504898787, 219.71), (49.504898787, 73.66), (36.804898787, 86.36), (36.804898787, 219.71), align=None)
        Polygon((17.678698787, 77.7875), (17.678698787, 219.71), (30.378698787, 219.71), (30.378698787, 90.4875), align=None)
    boss_extrude4 = extrude(amount=BOSS_EXTRUDE4_DEPTH, both=True)

    # CirPattern4: Boss-Extrude4 ×4 about axis
    cirpattern4_axis = Axis((0, 0, 0), (1, 0, 0))
    for i in range(1, CIRPATTERN4_COUNT):
        add(boss_extrude4.rotate(cirpattern4_axis, i * 360 / CIRPATTERN4_COUNT))

    # Sketch6 → Cut-Extrude1 (cut, through all)
    with BuildSketch(Plane.ZY.offset(140.081298787)):
        Circle(SKETCH6_R)
        with Locations(Location((0, 0, 0), (0, 0, 270))):
            Circle(SKETCH6_R_2, mode=Mode.SUBTRACT)
    extrude(amount=-CUT_EXTRUDE1_DEPTH, mode=Mode.SUBTRACT)

    # Fillet2
    fillet2_edges = [part.edges().sort_by_distance(p)[0] for p in [
        (-39.979898787, 46.736, 0),
    ]]
    fillet(fillet2_edges, radius=FILLET2_R)

    # Sketch7 → Cut-Extrude2 (cut)
    with BuildSketch(Plane(origin=(-39.979898787, 0, 0), x_dir=(0, 0, -1), z_dir=(1, 0, 0))):
        Circle(SKETCH7_R)
    extrude(amount=-CUT_EXTRUDE2_DEPTH, mode=Mode.SUBTRACT)

    # Sketch8 → Cut-Extrude3 (cut)
    with BuildSketch(Plane.ZY.offset(140.081298787)):
        Circle(SKETCH8_R)
    extrude(amount=-CUT_EXTRUDE3_DEPTH, mode=Mode.SUBTRACT)

    # Sketch11 → Cut-Extrude4 (cut)
    with BuildSketch(Plane.ZY.offset(64.998898787).offset(CUT_EXTRUDE4_START)):
        Circle(SKETCH11_R)
        with Locations(Location((0, 0, 0), (0, 0, 270))):
            Circle(SKETCH11_R_2, mode=Mode.SUBTRACT)
    extrude(amount=-CUT_EXTRUDE4_DEPTH, mode=Mode.SUBTRACT)

    # Sketch12 → Cut-Revolve1 (revolve, cut)
    with BuildSketch(Plane(origin=(0, 0, 0), x_dir=(1, 0, 0), z_dir=(0, 1, 0)), mode=Mode.PRIVATE) as cut_revolve1_sk:
        with BuildLine():
            Line((-121.132898787, 31.75), (-80.111898787, 31.75))
            ThreePointArc((-80.111898787, 31.75), (-76.957987839, 32.588616713), (-74.637123327, 34.882961973))
            Line((-74.637123327, 34.882961973), (-65.874123327, 49.795890249))
            ThreePointArc((-65.874123327, 49.795890249), (-65.613530636, 50.287482958), (-65.396970658, 50.8))
            Line((-65.396970658, 50.8), (-121.132898787, 50.8))
            Line((-121.132898787, 50.8), (-121.132898787, 31.75))
        make_face()
    revolve(cut_revolve1_sk.sketch.rotate(Axis((-60.172898787, 0, 0), (-1, 0, 0)), 270), axis=Axis((-60.172898787, 0, 0), (-1, 0, 0)), mode=Mode.SUBTRACT)

    # Sketch18 → Cut-Extrude10 (cut, up to next)
    with BuildSketch(Plane.ZY.offset(121.132898787), mode=Mode.PRIVATE) as cut_extrude10_sk1:
        with BuildLine():
            Line((-14.359429538, -21.094621628), (-21.094621628, -14.359429538))
            Line((-21.094621628, -14.359429538), (-17.575856913, -10.840664823))
            ThreePointArc((-17.575856913, -10.840664823), (14.601896453, 14.601896453), (-10.840664823, -17.575856913))
            Line((-10.840664823, -17.575856913), (-14.359429538, -21.094621628))
        make_face()
    cut_extrude10_tool1 = extrude(cut_extrude10_sk1.sketch, amount=-CUT_EXTRUDE10_REACH, mode=Mode.PRIVATE) & part.part
    add(cut_extrude10_tool1.solids().sort_by_distance((-121.132899, -0.51024, -0.51024))[0], mode=Mode.SUBTRACT)

    # Sketch20 → Cut-Extrude11 (cut)
    with BuildSketch(Plane.ZY.offset(121.132898787)):
        with Locations(Location((0, 0, 0), (0, 0, 270))):
            Circle(SKETCH20_R)
        with Locations(Location((0, 0, 0), (0, 0, 270))):
            Circle(SKETCH20_R_2, mode=Mode.SUBTRACT)
    extrude(amount=-CUT_EXTRUDE11_DEPTH, mode=Mode.SUBTRACT)

    # Sketch22 → Cut-Extrude13 (cut)
    with BuildSketch(Plane.ZY.offset(64.998898787)):
        with BuildLine():
            Line((50.92871008, 64.399094261), (145.78051919, 159.250903372))
            ThreePointArc((145.78051919, 159.250903372), (82.621353048, 199.465591069), (9.525, 215.689787368))
            Line((9.525, 215.689787368), (9.525, 84.123223233))
            ThreePointArc((9.525, 84.123223233), (24.00104092, 61.192302667), (50.92871008, 64.399094261))
        make_face()
    cut_extrude13 = extrude(amount=-CUT_EXTRUDE13_DEPTH, mode=Mode.SUBTRACT)

    # CirPattern6: Cut-Extrude13 ×8 about axis
    cirpattern6_axis = Axis((0, 0, 0), (1, 0, 0))
    for i in range(1, CIRPATTERN6_COUNT):
        add(cut_extrude13.rotate(cirpattern6_axis, i * 360 / CIRPATTERN6_COUNT), mode=Mode.SUBTRACT)

    # Sketch24 → Cut-Revolve2 (revolve, cut)
    with BuildSketch(Plane(origin=(0, 0, 0), x_dir=(1, 0, 0), z_dir=(0, 1, 0)), mode=Mode.PRIVATE) as cut_revolve2_sk:
        with Locations((5.346401213, 95.533573471)):
            Rectangle(SKETCH24_W, SKETCH24_H)
    revolve(cut_revolve2_sk.sketch.rotate(Axis((-154.951085714, 0, 0), (1, 0, 0)), 271.68541304), axis=Axis((-154.951085714, 0, 0), (1, 0, 0)), mode=Mode.SUBTRACT)

    # Sketch25 → Cut-Extrude14 (cut)
    with BuildSketch(Plane(origin=(-44.932898787, 0, 0), x_dir=(0, 0, -1), z_dir=(1, 0, 0))):
        with Locations(Location((0, 0, 0), (0, 0, 90))):
            Circle(SKETCH25_R)
    extrude(amount=-CUT_EXTRUDE14_DEPTH, mode=Mode.SUBTRACT)


solid = part.part
